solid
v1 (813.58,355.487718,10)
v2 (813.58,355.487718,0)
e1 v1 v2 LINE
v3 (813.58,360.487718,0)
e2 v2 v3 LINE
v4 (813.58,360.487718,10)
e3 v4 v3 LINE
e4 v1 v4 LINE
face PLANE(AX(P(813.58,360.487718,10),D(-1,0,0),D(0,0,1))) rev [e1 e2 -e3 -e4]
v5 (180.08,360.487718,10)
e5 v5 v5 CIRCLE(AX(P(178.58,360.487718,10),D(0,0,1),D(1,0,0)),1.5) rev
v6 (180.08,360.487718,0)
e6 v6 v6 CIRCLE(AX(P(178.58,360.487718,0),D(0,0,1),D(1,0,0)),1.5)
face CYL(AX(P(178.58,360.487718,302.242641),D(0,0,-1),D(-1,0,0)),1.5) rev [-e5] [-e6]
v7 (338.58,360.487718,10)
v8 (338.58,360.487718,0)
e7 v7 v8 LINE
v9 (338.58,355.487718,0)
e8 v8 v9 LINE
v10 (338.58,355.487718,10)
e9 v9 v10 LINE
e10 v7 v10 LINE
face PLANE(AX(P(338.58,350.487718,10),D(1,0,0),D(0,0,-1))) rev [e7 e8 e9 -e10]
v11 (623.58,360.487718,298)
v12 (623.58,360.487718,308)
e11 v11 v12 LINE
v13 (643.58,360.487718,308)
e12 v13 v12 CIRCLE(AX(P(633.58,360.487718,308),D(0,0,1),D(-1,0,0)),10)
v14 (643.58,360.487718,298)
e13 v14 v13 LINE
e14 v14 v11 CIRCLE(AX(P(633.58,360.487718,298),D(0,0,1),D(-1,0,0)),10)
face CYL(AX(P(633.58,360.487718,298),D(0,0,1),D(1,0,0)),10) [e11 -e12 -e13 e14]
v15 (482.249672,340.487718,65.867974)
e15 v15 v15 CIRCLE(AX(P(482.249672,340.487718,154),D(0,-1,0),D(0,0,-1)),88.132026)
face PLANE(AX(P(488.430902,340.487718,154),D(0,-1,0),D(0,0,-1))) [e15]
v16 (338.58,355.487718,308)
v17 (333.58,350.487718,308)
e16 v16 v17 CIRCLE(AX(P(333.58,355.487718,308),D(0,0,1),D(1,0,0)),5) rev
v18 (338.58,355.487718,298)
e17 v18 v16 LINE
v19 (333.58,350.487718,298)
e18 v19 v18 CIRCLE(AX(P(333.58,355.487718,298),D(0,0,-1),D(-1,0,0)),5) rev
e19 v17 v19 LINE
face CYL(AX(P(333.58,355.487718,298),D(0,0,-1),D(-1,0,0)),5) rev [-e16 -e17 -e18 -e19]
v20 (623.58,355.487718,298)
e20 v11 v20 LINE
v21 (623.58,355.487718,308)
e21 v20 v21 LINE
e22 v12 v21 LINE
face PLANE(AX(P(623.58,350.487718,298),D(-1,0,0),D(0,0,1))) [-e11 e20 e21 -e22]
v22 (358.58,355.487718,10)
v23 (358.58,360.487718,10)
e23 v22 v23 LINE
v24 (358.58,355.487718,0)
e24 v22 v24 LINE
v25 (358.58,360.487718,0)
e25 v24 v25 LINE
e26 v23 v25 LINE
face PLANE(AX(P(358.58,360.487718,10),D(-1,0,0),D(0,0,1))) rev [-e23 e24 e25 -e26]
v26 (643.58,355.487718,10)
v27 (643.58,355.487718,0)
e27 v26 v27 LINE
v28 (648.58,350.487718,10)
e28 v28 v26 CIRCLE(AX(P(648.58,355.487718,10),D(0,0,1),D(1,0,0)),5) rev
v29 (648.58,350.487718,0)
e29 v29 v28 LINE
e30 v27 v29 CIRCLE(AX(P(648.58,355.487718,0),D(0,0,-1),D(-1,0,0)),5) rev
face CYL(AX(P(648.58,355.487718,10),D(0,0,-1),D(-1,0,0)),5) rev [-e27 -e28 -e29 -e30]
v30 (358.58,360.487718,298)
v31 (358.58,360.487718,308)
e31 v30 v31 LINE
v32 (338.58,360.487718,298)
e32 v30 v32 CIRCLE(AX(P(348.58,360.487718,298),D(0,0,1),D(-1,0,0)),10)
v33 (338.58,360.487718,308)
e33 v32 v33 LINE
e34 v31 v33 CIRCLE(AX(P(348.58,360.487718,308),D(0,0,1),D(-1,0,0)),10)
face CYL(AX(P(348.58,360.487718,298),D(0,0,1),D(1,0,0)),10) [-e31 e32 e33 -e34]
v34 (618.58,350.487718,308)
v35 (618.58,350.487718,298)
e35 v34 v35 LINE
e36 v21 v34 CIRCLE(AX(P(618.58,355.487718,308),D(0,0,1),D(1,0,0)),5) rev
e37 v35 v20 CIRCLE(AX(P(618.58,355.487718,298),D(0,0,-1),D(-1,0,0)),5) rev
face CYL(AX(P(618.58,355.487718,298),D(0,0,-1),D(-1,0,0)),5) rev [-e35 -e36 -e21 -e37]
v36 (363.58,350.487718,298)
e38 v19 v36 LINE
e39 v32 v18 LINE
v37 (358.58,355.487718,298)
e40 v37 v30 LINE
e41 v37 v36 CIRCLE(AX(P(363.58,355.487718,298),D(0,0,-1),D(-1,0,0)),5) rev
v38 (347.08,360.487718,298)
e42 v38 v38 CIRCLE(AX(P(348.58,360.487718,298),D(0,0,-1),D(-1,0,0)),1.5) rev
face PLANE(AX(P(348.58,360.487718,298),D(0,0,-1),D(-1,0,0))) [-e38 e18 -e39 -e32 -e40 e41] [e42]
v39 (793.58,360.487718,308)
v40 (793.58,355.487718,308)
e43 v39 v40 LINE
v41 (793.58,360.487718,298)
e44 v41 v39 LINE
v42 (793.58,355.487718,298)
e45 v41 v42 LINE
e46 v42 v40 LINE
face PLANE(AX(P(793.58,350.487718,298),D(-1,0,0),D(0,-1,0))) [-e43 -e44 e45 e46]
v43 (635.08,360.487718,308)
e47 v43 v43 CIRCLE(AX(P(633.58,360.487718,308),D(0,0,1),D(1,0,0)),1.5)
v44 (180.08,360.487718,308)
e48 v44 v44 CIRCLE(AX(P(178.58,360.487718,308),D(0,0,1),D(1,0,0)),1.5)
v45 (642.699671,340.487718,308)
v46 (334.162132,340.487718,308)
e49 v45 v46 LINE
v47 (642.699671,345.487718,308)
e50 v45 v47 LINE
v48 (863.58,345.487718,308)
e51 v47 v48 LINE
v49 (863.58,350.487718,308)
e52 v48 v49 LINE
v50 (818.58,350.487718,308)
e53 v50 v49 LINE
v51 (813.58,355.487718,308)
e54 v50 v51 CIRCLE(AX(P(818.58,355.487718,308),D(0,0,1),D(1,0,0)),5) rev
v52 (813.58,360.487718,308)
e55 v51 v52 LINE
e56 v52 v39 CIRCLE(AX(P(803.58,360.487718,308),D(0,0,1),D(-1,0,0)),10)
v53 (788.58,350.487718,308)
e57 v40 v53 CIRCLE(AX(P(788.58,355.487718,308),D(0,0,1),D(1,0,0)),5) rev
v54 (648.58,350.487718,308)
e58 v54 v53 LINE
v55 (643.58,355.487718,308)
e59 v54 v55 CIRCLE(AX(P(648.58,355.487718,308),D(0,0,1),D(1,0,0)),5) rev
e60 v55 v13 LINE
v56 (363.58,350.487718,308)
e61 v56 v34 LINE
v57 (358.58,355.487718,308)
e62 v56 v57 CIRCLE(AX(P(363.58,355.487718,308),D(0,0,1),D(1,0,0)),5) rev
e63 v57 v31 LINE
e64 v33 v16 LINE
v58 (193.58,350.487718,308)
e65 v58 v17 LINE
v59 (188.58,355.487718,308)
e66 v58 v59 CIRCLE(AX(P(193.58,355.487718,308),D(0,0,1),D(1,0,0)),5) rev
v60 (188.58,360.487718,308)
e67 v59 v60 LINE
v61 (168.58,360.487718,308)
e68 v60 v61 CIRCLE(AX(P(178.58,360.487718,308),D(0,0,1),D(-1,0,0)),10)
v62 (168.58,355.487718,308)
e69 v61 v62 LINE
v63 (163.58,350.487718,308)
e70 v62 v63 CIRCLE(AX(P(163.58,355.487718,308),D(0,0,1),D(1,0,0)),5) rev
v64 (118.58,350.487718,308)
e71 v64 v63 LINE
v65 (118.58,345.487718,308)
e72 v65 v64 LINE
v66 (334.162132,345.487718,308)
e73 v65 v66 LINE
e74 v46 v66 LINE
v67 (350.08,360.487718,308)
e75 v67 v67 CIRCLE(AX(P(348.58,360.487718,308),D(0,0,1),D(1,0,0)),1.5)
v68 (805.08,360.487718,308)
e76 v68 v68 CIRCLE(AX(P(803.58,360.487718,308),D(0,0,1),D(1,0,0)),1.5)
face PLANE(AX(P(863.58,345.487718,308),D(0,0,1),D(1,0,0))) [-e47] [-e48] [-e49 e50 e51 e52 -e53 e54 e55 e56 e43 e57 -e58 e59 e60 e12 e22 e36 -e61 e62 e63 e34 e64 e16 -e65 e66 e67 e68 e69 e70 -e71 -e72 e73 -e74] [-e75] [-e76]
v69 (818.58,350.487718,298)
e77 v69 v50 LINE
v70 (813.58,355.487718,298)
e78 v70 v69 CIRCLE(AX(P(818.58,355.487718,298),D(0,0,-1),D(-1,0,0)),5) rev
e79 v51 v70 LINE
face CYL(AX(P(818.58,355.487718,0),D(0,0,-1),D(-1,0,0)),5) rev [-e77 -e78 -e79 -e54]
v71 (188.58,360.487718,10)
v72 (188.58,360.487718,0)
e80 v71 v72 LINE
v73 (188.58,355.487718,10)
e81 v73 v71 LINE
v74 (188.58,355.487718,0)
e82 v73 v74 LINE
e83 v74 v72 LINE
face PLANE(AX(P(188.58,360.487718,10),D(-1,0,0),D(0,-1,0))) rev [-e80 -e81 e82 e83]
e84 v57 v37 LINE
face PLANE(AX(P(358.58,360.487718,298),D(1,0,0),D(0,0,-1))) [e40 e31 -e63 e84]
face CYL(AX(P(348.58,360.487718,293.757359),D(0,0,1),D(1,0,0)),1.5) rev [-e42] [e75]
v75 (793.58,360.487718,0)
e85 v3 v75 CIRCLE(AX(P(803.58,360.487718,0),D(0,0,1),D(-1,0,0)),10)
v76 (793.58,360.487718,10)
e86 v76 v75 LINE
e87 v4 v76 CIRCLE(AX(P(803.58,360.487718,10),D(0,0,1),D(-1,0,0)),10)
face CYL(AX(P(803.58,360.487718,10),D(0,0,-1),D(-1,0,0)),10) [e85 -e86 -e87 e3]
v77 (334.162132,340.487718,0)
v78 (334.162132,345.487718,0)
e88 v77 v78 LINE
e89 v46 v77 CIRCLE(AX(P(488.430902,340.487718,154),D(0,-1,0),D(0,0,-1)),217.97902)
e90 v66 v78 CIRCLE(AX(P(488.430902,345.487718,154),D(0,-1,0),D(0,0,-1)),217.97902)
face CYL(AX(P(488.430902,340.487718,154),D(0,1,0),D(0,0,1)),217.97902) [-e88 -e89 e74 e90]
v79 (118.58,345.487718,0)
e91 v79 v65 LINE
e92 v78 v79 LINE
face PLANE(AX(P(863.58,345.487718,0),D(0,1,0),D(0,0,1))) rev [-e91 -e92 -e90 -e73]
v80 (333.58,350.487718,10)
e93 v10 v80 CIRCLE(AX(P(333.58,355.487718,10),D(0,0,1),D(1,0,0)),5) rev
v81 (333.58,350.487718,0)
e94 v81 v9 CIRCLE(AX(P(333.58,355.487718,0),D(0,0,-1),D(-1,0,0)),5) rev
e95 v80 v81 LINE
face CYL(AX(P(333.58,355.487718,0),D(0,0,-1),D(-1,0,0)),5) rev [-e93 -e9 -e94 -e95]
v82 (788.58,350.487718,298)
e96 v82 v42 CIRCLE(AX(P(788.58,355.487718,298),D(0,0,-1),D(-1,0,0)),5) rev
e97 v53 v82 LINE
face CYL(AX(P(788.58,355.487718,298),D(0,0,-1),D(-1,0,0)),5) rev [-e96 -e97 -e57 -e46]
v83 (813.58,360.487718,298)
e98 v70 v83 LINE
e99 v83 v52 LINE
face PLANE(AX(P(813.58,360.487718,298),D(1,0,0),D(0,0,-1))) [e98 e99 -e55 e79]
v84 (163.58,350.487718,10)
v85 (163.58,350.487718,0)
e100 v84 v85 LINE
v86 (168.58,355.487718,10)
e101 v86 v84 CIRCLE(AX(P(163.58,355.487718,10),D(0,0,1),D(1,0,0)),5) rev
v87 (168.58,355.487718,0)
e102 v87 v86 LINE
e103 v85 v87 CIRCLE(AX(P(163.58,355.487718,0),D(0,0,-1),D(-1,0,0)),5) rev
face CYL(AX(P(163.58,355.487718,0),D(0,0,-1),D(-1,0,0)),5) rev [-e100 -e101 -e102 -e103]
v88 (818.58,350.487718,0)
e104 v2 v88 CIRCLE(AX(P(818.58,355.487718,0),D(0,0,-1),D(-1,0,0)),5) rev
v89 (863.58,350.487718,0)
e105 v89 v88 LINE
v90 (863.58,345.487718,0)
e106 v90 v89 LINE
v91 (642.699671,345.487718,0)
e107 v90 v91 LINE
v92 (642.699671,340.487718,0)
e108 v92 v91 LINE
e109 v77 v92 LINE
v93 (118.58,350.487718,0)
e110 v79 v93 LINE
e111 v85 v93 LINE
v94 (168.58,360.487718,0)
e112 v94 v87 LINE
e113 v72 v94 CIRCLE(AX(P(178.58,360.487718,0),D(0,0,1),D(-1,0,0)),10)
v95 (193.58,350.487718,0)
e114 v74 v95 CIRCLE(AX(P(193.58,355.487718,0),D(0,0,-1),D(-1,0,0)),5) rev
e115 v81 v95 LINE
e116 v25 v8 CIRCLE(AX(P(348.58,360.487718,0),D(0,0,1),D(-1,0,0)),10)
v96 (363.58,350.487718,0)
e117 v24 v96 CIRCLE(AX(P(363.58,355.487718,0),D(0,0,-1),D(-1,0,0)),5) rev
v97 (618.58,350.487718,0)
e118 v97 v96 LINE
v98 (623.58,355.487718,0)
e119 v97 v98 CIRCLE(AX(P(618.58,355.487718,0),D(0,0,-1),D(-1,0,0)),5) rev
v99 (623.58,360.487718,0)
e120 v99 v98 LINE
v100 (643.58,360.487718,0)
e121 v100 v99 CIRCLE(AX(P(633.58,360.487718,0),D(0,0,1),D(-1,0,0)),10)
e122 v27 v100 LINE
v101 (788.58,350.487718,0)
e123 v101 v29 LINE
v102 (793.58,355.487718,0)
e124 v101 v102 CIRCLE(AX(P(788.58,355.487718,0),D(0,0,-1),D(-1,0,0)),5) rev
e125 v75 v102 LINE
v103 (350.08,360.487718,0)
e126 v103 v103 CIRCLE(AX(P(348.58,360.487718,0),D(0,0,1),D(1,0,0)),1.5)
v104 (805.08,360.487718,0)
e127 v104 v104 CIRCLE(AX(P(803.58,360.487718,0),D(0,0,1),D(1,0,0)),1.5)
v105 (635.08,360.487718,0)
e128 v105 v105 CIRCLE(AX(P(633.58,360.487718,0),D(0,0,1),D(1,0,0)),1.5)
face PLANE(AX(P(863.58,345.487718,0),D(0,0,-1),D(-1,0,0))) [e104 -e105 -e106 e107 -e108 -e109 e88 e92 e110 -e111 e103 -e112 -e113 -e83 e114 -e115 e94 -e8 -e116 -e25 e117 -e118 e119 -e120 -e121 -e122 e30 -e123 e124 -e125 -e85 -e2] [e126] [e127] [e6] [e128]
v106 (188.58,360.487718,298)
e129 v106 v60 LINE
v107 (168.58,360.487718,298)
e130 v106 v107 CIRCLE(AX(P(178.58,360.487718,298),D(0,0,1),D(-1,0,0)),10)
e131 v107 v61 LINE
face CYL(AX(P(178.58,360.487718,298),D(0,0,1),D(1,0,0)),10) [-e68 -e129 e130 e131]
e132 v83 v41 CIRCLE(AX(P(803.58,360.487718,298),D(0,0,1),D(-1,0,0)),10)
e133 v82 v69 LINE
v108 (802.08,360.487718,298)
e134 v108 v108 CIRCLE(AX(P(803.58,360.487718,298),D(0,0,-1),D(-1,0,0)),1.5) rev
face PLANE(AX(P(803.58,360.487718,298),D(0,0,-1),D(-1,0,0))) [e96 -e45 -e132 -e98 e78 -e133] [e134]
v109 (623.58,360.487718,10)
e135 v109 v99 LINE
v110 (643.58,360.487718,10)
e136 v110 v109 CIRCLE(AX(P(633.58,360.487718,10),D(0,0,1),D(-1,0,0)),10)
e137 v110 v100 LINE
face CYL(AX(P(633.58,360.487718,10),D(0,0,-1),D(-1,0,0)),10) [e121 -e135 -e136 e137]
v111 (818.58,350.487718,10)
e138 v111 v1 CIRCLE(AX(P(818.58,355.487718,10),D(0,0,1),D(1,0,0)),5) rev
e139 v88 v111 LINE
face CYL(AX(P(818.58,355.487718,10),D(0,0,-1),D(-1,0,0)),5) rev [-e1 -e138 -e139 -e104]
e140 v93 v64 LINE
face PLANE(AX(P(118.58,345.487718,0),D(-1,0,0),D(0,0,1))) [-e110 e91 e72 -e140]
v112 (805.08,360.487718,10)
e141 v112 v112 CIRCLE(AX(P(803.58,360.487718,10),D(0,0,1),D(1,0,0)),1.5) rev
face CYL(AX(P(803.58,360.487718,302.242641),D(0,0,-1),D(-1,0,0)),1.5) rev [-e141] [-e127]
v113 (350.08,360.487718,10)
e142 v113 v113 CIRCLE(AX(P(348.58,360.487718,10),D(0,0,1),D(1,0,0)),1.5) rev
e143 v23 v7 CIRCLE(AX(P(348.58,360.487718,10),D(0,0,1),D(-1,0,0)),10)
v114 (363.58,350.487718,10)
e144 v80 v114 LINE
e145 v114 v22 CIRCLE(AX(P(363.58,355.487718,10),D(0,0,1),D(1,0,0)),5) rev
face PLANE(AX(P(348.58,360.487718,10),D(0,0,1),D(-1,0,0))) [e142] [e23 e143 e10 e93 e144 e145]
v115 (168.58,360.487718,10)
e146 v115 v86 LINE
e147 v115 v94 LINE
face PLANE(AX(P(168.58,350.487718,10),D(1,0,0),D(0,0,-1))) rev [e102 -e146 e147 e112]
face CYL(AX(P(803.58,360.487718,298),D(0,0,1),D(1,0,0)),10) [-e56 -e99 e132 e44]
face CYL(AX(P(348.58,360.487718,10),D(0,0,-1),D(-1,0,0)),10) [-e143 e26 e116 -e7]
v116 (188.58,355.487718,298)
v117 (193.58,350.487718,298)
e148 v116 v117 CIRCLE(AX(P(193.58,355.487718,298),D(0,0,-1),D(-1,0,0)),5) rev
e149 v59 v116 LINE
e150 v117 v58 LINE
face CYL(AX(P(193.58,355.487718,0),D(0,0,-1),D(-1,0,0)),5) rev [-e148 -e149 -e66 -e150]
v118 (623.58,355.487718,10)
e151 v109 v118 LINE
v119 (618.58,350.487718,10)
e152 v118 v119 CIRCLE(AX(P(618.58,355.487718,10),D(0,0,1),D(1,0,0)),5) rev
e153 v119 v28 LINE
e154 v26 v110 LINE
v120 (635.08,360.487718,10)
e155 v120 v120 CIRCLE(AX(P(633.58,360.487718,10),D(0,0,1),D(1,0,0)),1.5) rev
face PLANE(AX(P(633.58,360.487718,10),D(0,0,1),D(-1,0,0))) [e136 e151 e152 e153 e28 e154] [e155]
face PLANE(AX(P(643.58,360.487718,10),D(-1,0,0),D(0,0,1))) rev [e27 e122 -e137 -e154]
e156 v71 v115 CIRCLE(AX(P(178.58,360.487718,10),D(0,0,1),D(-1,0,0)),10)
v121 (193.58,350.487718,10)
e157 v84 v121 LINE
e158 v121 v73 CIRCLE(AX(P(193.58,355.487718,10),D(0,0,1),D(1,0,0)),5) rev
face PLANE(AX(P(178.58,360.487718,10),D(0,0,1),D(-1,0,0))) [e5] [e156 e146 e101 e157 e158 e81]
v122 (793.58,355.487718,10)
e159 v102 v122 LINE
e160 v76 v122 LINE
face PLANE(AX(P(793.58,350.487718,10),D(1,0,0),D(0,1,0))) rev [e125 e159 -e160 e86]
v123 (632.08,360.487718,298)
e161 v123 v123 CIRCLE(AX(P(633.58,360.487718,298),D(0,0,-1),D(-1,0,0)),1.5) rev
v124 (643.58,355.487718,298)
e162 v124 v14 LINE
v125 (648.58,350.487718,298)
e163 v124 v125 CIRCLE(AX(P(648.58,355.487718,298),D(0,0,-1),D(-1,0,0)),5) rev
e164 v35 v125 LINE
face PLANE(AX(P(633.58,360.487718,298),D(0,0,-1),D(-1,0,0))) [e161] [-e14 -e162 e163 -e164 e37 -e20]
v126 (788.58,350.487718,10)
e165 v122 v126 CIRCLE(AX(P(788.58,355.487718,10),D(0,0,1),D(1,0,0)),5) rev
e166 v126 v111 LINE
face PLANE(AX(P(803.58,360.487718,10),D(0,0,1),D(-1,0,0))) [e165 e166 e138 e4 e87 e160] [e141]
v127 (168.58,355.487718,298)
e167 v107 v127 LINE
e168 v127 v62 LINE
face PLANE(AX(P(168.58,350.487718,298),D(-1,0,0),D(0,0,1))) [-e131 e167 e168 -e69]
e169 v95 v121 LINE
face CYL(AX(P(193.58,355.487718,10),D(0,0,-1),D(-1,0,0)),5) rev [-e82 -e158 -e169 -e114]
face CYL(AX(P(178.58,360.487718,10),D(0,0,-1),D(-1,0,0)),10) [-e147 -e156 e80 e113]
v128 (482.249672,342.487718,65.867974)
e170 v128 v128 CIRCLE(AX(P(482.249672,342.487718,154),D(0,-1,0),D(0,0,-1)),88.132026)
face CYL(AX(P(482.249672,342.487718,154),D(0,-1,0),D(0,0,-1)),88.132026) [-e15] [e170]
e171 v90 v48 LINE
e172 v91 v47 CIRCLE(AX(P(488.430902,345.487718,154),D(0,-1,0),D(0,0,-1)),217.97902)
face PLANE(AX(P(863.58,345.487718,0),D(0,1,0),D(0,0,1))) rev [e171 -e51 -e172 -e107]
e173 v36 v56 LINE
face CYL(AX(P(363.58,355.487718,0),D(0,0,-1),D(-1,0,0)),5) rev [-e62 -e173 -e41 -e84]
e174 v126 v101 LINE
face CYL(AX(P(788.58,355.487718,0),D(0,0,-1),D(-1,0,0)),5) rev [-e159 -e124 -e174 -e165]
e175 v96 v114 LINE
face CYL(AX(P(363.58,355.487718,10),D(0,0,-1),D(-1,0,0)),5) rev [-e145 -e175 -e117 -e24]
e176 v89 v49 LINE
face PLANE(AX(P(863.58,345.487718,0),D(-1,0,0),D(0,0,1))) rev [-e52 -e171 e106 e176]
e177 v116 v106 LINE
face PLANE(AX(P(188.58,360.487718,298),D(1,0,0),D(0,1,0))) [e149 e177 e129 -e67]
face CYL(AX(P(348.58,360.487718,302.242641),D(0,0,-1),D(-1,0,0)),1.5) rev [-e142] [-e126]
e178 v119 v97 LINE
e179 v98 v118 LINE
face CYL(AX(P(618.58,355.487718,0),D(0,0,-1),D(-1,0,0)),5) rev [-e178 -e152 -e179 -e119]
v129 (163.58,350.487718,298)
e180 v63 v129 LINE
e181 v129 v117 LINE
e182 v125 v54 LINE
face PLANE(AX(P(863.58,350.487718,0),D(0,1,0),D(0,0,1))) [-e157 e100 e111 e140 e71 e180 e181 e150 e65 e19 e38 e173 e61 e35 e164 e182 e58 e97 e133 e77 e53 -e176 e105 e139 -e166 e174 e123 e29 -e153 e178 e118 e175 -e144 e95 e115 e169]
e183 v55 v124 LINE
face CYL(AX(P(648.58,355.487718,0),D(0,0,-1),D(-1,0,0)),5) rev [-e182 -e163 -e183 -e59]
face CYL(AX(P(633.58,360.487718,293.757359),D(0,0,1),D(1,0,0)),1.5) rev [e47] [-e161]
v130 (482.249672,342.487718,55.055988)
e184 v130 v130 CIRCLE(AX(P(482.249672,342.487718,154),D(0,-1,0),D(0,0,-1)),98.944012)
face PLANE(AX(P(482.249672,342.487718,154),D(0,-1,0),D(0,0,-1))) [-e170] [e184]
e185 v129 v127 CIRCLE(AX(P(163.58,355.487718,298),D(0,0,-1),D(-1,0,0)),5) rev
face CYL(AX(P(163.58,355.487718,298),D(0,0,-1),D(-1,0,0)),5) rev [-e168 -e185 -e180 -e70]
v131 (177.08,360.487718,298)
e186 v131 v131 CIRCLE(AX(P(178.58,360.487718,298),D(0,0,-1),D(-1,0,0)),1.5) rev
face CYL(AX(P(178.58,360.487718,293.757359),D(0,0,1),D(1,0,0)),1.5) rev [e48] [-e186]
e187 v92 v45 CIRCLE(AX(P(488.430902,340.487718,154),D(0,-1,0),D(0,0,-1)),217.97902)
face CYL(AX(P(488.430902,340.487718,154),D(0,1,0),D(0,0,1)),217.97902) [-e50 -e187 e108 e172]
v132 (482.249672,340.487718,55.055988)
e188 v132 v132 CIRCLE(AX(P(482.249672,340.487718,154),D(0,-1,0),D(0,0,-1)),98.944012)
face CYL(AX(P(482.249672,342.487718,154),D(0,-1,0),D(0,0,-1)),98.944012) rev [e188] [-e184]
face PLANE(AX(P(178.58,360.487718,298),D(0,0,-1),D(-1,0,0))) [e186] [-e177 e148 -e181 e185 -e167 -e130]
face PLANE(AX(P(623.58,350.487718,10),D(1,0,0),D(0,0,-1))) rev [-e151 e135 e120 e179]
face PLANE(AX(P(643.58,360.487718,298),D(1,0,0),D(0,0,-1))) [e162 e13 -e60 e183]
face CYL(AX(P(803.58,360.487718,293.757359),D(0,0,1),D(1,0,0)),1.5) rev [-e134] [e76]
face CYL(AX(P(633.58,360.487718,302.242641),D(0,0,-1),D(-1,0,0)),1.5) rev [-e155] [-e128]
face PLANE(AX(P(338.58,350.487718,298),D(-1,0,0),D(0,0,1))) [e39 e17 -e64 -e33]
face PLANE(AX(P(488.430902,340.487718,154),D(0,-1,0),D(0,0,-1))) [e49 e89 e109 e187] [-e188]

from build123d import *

# Parameters (mm, degrees)
THICKEN2_START      = 118.58
THICKEN2_OUTLINE_W  = 5
THICKEN2_OUTLINE_H  = 308
THICKEN2_DEPTH      = 745
BOSS_EXTRUDE1_DEPTH = 10
SKETCH3_R           = 1.5
CUT_EXTRUDE1_DEPTH  = 298
FILLET1_R           = 5
FILLET2_R           = 5
BOSS_EXTRUDE2_DEPTH = 5
SKETCH5_R           = 98.944012136
SKETCH5_R_2         = 88.132026091
CUT_EXTRUDE2_DEPTH  = 2


# Read off the part's stored shape, not the designer's step: Thicken2
with BuildPart() as part:
    # Thicken2 outline → Thicken2 (new body)
    with BuildSketch(Plane.YZ.offset(THICKEN2_START)):
        with Locations((347.987717935, 154)):
            Rectangle(THICKEN2_OUTLINE_W, THICKEN2_OUTLINE_H)
    extrude(amount=THICKEN2_DEPTH)

    # Sketch2 → Boss-Extrude1 (add)
    with BuildSketch(Plane.XY.offset(308)):
        with BuildLine():
            Line((168.58, 350.487717935), (168.58, 360.487717935))
            ThreePointArc((168.58, 360.487717935), (178.58, 370.487717935), (188.58, 360.487717935))
            Line((188.58, 360.487717935), (188.58, 350.487717935))
            Line((188.58, 350.487717935), (168.58, 350.487717935))
        make_face()
        with BuildLine():
            Line((338.58, 350.487717935), (338.58, 360.487717935))
            ThreePointArc((338.58, 360.487717935), (348.58, 370.487717935), (358.58, 360.487717935))
            Line((358.58, 360.487717935), (358.58, 350.487717935))
            Line((358.58, 350.487717935), (338.58, 350.487717935))
        make_face()
        with BuildLine():
            Line((623.58, 350.487717935), (623.58, 360.487717935))
            ThreePointArc((623.58, 360.487717935), (633.58, 370.487717935), (643.58, 360.487717935))
            Line((643.58, 360.487717935), (643.58, 350.487717935))
            Line((643.58, 350.487717935), (623.58, 350.487717935))
        make_face()
        with BuildLine():
            Line((793.58, 350.487717935), (793.58, 360.487717935))
            ThreePointArc((793.58, 360.487717935), (803.58, 370.487717935), (813.58, 360.487717935))
            Line((813.58, 360.487717935), (813.58, 350.487717935))
            Line((813.58, 350.487717935), (793.58, 350.487717935))
        make_face()
    boss_extrude1 = extrude(amount=-BOSS_EXTRUDE1_DEPTH)

    # Sketch3 → Cut-Extrude1 (cut)
    with BuildSketch(Plane.XY.offset(308)):
        with Locations((178.58, 360.487717935)):
            Circle(SKETCH3_R)
        with Locations((348.58, 360.487717935)):
            Circle(SKETCH3_R)
        with Locations((633.58, 360.487717935)):
            Circle(SKETCH3_R)
        with Locations((803.58, 360.487717935)):
            Circle(SKETCH3_R)
    cut_extrude1 = extrude(amount=-CUT_EXTRUDE1_DEPTH, mode=Mode.SUBTRACT)

    # Fillet1
    fillet1_edges = [part.edges().sort_by_distance(p)[0] for p in [
        (188.58, 350.487717935, 303),
        (168.58, 350.487717935, 303),
        (358.58, 350.487717935, 303),
        (338.58, 350.487717935, 303),
        (643.58, 350.487717935, 303),
        (623.58, 350.487717935, 303),
        (813.58, 350.487717935, 303),
        (793.58, 350.487717935, 303),
    ]]
    fillet(fillet1_edges, radius=FILLET1_R)

    # Mirror2: Boss-Extrude1 across plane
    add(boss_extrude1.mirror(Plane.XY.offset(154)))

    # Mirror3: Cut-Extrude1 across plane
    add(cut_extrude1.mirror(Plane.XY.offset(154)), mode=Mode.SUBTRACT)

    # Fillet2
    fillet2_edges = [part.edges().sort_by_distance(p)[0] for p in [
        (168.58, 350.487717935, 5),
        (188.58, 350.487717935, 5),
        (338.58, 350.487717935, 5),
        (358.58, 350.487717935, 5),
        (623.58, 350.487717935, 5),
        (643.58, 350.487717935, 5),
        (793.58, 350.487717935, 5),
        (813.58, 350.487717935, 5),
    ]]
    fillet(fillet2_edges, radius=FILLET2_R)

    # Sketch4 → Boss-Extrude2 (add)
    with BuildSketch(Plane.XZ.offset(-345.487717935)):
        with BuildLine():
            Line((334.162131755, 308), (642.69967146, 308))
            ThreePointArc((642.69967146, 308), (706.409922047, 154), (642.69967146, 0))
            Line((642.69967146, 0), (334.162131755, 0))
            ThreePointArc((334.162131755, 0), (270.451881168, 154), (334.162131755, 308))
        make_face()
    extrude(amount=BOSS_EXTRUDE2_DEPTH)

    # Sketch5 → Cut-Extrude2 (cut)
    with BuildSketch(Plane.XZ.offset(-340.487717935)):
        with Locations(Location((482.249672024, 154, 0), (0, 0, 270))):
            Circle(SKETCH5_R)
        with Locations(Location((482.249672024, 154, 0), (0, 0, 270))):
            Circle(SKETCH5_R_2, mode=Mode.SUBTRACT)
    extrude(amount=-CUT_EXTRUDE2_DEPTH, mode=Mode.SUBTRACT)


solid = part.part
